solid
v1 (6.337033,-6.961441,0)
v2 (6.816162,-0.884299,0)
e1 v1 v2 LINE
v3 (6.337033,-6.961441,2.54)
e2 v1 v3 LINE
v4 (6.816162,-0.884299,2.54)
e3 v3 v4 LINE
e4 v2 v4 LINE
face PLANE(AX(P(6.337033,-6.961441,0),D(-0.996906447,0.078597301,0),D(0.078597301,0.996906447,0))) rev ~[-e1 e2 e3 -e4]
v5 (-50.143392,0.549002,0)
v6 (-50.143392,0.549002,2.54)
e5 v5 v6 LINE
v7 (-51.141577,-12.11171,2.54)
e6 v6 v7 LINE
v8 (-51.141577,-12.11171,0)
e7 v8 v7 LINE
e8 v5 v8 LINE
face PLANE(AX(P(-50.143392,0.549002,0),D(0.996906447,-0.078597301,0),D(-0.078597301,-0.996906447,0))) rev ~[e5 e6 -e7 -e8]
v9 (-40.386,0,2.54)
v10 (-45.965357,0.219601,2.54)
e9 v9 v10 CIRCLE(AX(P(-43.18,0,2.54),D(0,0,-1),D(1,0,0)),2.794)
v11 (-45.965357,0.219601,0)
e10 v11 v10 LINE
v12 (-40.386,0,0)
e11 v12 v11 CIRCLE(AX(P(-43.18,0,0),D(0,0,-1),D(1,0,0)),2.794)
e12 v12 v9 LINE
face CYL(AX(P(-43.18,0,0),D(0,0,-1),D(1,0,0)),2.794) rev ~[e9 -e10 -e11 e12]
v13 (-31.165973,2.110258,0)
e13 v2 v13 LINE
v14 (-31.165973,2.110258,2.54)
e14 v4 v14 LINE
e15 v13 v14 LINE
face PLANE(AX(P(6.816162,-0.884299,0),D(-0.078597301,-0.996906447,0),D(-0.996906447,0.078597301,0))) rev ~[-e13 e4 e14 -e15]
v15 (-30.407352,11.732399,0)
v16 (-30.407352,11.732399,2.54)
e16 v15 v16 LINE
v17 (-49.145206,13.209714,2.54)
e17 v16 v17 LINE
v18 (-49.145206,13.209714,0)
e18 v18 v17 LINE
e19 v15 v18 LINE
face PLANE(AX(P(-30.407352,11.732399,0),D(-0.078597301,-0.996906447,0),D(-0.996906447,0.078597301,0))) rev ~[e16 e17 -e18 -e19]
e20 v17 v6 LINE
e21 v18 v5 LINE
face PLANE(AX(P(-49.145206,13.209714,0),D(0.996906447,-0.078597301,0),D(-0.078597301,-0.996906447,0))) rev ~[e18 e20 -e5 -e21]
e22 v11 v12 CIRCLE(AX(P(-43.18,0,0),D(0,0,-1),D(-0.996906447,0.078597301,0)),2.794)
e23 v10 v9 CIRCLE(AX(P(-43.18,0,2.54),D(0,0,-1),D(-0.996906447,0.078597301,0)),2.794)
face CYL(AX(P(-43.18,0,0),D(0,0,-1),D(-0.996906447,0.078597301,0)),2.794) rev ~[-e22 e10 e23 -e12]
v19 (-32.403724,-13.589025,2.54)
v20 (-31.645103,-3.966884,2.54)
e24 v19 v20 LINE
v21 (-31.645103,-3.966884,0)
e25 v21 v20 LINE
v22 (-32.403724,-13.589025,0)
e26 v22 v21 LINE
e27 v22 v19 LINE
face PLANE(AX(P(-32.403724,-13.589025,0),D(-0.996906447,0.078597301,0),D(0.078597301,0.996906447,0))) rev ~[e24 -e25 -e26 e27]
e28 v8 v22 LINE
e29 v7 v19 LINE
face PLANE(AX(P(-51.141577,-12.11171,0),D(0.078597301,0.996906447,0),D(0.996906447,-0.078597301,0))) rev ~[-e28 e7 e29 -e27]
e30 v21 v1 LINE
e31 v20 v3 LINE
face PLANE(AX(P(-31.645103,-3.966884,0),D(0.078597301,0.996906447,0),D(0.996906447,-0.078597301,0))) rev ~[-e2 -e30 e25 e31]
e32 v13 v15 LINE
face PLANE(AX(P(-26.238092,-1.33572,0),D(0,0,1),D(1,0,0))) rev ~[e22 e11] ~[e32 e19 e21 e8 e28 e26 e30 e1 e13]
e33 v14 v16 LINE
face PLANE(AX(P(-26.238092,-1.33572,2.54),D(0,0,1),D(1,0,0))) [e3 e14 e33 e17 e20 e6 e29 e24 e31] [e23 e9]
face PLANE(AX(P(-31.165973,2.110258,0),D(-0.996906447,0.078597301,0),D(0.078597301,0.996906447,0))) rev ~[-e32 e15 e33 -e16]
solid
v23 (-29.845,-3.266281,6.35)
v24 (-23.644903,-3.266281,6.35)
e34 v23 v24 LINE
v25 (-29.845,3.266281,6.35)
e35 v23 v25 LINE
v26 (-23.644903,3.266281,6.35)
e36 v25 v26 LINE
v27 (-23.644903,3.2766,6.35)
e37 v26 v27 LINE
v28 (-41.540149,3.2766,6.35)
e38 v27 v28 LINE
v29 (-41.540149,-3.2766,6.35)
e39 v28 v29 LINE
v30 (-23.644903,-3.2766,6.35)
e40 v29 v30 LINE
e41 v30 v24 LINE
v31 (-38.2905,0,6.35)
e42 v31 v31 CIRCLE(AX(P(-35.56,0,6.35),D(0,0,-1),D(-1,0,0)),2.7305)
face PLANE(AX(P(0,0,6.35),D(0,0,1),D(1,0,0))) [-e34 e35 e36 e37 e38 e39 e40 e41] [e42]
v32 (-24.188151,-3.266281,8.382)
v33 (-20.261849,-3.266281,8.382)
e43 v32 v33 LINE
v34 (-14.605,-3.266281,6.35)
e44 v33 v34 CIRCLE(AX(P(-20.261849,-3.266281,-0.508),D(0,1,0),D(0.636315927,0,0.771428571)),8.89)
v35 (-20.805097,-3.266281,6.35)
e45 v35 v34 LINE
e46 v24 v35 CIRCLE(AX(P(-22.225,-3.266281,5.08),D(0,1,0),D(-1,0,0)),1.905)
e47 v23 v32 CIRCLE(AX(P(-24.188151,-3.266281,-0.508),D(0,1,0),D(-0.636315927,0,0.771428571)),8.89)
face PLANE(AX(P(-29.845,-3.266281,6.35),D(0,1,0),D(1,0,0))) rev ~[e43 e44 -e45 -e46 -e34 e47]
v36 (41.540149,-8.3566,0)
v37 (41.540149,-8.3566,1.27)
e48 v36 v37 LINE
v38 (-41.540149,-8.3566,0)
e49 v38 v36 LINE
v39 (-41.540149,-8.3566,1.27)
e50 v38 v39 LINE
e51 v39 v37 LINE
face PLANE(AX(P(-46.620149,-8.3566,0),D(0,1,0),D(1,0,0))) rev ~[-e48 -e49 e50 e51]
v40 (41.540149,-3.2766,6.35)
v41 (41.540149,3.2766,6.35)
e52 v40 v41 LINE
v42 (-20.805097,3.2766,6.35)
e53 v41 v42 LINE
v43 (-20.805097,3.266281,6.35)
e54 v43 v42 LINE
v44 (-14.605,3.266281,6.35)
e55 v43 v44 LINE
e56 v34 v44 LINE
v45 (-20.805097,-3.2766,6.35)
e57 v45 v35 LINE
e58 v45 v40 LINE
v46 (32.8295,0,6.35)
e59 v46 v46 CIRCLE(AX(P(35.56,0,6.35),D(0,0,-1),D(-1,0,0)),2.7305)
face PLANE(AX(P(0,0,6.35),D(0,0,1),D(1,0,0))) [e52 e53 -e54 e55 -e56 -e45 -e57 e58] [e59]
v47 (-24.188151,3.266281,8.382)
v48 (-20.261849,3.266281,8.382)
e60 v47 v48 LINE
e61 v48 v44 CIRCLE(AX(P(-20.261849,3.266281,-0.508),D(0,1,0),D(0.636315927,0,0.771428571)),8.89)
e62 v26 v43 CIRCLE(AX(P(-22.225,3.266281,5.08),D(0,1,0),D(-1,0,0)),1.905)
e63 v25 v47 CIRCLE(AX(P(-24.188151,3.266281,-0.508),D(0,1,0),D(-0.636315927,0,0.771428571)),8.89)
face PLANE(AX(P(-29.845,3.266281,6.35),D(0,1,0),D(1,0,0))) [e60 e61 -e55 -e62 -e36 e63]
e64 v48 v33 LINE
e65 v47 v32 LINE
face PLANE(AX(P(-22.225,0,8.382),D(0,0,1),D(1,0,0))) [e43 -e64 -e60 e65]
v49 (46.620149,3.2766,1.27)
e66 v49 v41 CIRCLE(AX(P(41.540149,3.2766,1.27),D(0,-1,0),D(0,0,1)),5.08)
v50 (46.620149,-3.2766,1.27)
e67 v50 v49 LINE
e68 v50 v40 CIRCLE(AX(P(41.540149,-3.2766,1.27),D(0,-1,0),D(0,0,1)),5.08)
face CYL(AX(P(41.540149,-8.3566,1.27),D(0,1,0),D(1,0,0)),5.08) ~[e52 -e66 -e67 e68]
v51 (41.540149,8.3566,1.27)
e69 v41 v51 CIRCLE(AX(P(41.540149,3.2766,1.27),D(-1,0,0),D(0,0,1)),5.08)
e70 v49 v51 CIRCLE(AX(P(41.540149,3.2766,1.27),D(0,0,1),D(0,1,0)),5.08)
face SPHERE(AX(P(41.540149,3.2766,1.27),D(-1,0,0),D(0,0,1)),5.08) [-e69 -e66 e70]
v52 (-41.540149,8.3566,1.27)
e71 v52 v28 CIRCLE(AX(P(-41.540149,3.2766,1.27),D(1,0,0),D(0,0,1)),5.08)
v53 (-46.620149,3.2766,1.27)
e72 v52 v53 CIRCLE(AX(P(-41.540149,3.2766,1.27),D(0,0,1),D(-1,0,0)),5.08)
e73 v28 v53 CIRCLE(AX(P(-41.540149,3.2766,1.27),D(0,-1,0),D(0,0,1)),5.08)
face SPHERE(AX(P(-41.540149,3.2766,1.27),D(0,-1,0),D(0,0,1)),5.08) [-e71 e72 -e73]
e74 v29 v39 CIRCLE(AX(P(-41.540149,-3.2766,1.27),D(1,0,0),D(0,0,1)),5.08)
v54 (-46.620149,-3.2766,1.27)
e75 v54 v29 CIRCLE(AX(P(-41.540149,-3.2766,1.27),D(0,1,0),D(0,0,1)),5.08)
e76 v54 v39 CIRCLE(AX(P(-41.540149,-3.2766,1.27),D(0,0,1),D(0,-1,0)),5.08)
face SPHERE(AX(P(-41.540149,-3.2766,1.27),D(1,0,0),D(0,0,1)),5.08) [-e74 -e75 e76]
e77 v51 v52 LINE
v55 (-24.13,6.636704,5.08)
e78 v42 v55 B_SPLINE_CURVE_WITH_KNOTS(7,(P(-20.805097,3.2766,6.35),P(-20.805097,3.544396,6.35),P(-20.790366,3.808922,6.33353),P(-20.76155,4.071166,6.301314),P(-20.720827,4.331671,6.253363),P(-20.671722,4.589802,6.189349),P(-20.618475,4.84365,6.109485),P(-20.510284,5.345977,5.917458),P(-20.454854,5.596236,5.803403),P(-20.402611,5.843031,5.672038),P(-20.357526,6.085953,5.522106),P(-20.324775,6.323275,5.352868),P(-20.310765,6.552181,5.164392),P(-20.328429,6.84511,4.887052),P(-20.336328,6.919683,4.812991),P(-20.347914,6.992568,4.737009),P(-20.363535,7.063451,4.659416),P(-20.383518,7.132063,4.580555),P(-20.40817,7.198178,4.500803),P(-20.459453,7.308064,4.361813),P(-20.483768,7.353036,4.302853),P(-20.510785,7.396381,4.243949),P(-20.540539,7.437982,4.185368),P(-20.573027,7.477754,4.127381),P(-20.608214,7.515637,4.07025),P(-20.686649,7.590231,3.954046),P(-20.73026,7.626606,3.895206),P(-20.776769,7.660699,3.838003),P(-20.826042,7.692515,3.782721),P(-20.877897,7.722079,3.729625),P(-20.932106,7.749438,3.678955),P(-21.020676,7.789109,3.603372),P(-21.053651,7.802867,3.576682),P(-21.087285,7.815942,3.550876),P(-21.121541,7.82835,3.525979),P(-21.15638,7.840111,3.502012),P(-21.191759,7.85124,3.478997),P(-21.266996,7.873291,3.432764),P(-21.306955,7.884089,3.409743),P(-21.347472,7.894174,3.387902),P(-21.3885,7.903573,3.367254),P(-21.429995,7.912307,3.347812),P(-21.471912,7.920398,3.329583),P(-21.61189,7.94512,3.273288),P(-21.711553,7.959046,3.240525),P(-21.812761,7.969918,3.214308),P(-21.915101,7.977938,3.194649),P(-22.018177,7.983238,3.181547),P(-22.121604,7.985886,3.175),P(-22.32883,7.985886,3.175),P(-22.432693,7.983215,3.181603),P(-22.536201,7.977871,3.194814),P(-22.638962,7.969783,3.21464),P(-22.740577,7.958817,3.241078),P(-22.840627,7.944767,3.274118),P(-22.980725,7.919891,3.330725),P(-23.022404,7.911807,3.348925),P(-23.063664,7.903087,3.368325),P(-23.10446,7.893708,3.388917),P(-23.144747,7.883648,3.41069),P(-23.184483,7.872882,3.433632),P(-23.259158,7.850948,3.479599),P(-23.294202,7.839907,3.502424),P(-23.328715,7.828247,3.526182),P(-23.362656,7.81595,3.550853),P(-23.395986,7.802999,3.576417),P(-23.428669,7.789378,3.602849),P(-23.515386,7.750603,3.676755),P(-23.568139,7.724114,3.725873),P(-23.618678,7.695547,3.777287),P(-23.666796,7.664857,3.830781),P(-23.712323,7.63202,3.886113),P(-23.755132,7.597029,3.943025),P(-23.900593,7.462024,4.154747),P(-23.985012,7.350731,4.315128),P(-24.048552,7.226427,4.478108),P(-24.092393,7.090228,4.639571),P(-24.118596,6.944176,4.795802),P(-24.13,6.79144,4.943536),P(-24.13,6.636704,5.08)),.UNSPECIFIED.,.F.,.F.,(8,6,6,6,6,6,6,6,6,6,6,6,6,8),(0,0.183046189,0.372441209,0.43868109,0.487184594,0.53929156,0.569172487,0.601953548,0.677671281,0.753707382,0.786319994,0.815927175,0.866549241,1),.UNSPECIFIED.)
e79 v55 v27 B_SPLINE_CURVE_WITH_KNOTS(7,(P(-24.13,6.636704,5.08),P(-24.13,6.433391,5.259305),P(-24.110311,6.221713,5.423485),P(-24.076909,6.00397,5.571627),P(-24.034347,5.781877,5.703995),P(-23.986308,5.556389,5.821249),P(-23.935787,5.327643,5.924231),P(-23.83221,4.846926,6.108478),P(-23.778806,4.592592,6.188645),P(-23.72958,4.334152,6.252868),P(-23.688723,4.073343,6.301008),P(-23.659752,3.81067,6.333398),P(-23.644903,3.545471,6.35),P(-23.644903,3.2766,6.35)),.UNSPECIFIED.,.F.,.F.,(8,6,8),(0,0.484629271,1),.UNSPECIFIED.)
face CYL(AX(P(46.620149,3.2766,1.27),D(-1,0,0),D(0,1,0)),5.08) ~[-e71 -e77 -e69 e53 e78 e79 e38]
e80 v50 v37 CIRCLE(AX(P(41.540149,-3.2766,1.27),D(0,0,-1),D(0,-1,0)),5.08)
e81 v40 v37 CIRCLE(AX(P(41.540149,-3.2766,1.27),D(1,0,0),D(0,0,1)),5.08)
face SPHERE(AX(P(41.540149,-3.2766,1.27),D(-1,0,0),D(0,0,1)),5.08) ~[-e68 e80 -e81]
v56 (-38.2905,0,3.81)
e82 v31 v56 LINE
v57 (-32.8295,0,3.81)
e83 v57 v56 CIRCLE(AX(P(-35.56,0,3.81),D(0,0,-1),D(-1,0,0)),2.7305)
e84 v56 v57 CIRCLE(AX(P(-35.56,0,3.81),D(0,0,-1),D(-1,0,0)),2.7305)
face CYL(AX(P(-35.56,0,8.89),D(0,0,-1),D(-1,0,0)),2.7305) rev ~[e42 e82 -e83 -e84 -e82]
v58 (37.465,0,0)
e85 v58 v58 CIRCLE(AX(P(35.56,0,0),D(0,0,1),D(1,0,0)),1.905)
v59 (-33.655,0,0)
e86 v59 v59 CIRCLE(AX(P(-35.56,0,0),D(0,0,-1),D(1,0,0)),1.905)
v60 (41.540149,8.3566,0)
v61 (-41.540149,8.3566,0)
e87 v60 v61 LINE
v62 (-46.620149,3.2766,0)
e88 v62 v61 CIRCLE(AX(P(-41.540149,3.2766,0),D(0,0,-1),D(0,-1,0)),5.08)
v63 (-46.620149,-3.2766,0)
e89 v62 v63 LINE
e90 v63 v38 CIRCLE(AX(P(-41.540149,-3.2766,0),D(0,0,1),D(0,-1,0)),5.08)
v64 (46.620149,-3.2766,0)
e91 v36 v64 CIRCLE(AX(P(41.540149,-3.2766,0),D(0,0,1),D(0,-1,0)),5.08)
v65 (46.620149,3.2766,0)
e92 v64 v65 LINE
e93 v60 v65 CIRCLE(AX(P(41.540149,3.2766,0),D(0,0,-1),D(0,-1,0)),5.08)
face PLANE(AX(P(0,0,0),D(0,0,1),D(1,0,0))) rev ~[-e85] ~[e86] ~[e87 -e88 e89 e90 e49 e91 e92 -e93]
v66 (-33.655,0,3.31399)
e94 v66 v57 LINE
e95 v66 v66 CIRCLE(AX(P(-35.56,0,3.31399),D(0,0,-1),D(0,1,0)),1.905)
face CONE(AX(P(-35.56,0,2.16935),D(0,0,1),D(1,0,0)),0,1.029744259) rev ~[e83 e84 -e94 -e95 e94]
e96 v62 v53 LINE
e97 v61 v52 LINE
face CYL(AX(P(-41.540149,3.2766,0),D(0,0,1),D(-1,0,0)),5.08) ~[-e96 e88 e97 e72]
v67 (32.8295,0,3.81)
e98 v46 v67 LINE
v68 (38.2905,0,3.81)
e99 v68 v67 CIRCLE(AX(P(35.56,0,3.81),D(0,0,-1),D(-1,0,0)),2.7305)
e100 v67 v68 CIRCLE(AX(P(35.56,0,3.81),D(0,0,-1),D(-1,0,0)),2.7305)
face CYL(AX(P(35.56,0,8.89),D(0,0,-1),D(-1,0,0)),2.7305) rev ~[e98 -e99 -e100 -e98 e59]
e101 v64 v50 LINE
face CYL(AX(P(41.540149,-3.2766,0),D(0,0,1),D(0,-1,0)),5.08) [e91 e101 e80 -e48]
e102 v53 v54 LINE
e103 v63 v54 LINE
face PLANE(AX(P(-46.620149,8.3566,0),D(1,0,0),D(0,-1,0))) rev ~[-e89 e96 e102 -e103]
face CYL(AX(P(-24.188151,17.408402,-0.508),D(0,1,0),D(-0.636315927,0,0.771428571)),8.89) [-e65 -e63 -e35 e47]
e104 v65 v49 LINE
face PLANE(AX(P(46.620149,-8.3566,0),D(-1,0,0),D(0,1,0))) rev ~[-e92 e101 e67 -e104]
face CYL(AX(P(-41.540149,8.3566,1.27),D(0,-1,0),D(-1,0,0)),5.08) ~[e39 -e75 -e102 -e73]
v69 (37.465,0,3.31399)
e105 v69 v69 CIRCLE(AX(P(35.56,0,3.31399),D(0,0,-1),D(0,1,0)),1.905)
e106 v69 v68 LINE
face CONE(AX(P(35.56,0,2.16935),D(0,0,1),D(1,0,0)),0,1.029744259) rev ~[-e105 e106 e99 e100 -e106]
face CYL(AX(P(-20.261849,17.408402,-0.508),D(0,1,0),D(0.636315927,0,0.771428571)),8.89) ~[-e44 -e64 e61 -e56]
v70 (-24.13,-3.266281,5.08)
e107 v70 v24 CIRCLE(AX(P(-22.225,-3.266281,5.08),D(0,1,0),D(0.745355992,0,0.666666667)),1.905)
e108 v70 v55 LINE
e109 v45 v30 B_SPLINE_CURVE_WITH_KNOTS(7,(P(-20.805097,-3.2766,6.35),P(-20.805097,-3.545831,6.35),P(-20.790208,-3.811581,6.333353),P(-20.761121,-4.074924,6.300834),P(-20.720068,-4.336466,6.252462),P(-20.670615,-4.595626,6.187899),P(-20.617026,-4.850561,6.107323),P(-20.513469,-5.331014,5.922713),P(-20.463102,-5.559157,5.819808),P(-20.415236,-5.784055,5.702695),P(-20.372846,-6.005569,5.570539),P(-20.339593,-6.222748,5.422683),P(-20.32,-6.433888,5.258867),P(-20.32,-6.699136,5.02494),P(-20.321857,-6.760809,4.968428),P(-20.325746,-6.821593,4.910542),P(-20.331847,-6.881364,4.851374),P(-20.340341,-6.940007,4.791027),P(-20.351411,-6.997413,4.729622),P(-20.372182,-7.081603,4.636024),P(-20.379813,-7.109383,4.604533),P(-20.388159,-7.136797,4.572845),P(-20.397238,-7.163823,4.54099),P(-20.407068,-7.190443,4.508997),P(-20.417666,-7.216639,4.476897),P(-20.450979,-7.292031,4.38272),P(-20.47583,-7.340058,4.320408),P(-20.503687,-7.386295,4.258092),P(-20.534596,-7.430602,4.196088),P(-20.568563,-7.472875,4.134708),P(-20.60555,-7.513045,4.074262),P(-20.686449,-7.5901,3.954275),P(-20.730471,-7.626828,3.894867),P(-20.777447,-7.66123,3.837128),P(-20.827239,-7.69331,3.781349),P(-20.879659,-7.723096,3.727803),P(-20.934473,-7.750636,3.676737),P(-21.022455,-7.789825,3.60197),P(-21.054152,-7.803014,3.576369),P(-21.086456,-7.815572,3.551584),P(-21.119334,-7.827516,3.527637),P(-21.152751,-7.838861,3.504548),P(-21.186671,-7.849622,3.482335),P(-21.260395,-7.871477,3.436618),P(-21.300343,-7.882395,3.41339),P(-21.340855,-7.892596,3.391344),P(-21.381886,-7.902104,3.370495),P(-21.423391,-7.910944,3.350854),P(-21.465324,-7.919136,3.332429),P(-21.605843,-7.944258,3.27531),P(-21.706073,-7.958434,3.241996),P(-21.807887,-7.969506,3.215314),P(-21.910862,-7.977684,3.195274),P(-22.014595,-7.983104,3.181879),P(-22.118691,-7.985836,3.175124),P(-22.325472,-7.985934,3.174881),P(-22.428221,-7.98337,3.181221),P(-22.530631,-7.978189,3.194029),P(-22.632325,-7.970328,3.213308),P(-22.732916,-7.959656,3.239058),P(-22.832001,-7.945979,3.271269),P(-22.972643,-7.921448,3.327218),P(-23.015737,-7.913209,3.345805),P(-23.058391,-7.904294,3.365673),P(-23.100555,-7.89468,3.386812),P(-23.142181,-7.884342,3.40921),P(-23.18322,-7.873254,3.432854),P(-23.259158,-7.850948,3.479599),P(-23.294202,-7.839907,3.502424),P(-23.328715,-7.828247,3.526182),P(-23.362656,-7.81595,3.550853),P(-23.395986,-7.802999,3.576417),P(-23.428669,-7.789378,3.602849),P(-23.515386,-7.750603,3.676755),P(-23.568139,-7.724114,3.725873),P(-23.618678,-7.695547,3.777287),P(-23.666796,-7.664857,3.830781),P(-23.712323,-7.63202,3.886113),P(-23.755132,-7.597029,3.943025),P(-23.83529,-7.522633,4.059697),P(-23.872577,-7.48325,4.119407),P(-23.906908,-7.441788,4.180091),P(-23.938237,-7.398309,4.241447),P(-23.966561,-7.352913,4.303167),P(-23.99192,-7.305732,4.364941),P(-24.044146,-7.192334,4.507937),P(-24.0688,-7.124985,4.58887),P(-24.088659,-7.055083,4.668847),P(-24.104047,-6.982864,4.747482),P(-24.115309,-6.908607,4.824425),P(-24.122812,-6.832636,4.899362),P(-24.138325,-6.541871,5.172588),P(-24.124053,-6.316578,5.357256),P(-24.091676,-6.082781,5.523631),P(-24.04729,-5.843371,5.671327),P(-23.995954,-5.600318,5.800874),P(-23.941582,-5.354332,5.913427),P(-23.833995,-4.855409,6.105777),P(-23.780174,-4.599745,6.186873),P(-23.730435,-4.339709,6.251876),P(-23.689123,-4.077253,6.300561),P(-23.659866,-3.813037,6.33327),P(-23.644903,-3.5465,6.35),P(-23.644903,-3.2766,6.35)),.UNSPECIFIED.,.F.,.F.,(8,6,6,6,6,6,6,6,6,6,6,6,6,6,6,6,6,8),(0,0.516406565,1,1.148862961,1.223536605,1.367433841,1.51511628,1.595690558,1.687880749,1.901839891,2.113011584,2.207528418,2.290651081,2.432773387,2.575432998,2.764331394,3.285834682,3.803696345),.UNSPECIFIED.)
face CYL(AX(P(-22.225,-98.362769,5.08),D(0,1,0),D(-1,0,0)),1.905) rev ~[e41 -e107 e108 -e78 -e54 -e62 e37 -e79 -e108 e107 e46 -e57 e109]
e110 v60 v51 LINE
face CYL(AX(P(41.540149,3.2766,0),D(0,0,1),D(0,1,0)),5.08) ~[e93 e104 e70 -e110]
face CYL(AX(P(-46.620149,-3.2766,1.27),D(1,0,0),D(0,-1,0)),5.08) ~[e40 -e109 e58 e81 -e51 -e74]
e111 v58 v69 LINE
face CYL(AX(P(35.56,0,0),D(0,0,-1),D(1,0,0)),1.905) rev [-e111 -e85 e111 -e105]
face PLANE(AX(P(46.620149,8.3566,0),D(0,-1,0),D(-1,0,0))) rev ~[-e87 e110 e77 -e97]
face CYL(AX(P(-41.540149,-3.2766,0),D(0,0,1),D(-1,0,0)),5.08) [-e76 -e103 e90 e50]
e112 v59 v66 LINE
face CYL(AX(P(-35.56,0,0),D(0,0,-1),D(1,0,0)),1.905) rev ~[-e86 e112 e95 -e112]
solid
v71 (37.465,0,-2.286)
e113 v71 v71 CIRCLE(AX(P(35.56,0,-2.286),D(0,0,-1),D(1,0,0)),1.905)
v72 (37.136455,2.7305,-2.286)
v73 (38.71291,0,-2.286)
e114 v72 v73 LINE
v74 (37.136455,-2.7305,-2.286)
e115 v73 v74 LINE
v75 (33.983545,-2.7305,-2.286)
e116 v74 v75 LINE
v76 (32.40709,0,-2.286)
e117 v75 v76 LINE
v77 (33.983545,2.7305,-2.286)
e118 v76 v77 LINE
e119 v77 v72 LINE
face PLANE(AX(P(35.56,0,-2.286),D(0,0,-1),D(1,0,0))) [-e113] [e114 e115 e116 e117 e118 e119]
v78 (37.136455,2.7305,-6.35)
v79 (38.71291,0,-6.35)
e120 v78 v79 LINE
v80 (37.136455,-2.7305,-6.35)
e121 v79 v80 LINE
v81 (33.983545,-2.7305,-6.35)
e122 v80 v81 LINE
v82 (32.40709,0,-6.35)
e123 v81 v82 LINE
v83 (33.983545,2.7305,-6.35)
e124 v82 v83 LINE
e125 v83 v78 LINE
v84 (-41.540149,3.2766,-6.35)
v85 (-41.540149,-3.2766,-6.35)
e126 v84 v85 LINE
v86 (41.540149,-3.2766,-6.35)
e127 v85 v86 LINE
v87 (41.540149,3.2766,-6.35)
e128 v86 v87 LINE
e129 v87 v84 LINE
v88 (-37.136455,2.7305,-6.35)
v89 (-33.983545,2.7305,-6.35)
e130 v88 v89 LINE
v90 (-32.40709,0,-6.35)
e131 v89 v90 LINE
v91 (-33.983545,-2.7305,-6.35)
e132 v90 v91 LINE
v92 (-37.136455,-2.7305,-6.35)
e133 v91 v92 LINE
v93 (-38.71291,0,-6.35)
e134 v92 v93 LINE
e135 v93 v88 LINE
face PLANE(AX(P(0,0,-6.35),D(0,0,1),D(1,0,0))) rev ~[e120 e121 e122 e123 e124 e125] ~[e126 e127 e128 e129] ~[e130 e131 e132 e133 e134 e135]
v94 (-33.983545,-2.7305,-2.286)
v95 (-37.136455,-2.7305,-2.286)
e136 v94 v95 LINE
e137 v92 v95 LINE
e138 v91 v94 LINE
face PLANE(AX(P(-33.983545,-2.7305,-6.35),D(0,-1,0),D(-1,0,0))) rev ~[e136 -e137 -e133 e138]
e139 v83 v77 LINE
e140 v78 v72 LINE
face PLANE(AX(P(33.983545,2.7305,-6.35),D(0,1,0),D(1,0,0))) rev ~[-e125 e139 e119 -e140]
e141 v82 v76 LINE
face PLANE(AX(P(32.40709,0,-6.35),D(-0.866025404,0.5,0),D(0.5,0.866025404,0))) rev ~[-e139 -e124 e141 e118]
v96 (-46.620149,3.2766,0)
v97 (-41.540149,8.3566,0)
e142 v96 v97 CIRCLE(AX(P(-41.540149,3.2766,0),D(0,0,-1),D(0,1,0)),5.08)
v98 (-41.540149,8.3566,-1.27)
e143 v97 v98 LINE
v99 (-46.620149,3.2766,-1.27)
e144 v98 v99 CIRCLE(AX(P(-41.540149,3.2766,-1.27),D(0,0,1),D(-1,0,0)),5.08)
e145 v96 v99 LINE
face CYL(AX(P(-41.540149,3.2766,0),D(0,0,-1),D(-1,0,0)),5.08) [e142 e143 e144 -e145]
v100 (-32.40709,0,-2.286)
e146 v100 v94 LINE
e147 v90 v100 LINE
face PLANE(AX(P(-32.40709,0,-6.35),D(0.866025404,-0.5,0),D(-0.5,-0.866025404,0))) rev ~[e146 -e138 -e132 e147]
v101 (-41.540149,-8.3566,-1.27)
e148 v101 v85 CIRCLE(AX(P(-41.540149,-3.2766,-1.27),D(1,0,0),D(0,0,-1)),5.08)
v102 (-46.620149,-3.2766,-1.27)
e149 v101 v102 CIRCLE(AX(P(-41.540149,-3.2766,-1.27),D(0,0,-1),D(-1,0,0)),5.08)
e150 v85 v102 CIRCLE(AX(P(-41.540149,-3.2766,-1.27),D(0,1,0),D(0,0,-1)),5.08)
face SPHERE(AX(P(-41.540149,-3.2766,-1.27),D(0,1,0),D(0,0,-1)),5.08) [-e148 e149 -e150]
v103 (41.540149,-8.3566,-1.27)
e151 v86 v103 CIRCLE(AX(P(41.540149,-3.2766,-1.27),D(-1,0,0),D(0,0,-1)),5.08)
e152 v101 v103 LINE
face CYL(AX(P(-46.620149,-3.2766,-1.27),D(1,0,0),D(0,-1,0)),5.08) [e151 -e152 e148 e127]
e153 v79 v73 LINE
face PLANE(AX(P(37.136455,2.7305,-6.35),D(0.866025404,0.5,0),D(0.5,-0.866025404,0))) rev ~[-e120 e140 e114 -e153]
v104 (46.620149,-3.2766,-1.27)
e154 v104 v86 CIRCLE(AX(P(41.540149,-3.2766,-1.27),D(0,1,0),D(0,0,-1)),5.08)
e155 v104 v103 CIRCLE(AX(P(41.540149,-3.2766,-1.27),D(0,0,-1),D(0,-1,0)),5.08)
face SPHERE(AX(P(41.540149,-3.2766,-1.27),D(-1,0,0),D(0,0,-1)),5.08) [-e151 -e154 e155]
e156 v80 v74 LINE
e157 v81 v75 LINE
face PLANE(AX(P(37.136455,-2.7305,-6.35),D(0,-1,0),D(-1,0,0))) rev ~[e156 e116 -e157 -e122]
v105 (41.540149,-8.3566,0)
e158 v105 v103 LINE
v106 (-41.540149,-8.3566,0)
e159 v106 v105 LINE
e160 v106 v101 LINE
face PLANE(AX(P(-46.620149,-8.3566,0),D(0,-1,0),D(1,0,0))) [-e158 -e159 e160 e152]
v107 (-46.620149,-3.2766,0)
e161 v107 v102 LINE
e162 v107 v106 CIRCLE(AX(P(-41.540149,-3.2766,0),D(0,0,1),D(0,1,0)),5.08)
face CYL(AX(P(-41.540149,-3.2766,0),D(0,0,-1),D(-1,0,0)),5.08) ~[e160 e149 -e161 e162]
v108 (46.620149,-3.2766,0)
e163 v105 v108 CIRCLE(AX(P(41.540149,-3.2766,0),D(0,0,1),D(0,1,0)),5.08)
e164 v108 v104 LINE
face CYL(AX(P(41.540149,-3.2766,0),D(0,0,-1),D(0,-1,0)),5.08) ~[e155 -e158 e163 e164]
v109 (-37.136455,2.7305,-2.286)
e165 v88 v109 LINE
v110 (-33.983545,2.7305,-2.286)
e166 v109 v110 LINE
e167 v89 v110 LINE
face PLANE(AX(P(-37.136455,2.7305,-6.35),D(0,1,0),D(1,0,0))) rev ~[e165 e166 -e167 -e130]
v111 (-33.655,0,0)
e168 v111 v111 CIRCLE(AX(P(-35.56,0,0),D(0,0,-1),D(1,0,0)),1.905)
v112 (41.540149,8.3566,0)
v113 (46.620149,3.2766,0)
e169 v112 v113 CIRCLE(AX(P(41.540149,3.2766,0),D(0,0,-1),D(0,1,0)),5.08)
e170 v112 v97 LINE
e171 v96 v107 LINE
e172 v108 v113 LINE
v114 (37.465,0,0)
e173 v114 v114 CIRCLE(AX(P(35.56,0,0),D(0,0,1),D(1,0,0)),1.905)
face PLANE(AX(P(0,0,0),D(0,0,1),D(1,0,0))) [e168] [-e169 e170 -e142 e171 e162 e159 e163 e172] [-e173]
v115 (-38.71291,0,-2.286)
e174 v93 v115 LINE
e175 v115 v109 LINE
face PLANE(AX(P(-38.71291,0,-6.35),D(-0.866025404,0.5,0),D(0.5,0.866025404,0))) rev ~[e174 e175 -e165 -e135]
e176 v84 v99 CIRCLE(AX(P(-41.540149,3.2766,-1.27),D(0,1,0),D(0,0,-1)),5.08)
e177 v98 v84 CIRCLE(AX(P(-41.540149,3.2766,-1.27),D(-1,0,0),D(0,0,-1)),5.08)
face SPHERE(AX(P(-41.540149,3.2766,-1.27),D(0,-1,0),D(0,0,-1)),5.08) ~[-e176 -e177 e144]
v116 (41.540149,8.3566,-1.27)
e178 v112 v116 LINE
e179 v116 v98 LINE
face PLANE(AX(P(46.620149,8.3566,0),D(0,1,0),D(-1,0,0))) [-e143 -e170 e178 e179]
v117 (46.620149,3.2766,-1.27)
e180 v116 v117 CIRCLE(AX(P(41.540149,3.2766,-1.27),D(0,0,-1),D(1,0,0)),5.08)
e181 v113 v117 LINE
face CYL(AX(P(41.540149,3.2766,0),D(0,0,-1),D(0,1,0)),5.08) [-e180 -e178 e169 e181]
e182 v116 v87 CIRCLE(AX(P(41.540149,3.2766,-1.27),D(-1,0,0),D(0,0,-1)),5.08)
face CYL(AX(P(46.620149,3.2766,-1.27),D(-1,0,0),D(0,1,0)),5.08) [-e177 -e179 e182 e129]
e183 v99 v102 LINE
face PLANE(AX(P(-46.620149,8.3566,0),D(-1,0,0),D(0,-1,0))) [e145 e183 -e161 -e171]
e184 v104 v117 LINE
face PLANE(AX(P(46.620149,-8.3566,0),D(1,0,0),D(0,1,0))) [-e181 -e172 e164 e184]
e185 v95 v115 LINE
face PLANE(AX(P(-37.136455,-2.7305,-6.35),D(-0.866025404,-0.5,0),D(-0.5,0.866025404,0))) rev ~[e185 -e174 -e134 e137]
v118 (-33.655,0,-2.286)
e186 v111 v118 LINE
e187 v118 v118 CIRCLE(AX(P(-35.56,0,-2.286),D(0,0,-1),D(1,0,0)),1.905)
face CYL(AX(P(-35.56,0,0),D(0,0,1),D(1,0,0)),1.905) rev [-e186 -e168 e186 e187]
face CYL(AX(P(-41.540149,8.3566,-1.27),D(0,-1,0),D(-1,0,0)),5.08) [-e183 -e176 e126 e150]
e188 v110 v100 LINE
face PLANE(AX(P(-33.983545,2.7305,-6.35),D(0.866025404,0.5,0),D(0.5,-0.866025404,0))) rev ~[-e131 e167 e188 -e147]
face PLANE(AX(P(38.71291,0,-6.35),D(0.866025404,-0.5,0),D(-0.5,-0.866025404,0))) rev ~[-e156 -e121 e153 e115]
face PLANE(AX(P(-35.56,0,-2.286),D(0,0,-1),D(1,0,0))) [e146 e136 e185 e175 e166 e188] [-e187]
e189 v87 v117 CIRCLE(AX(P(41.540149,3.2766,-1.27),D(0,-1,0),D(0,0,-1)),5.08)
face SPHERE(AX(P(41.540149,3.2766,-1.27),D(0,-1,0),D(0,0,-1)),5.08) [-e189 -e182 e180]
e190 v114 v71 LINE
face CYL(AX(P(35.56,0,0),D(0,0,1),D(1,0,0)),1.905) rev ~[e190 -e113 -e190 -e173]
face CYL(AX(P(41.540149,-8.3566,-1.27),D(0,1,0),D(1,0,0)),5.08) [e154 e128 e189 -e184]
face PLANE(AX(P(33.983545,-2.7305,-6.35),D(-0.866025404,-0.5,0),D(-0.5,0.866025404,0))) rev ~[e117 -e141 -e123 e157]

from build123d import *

# Parameters (mm, degrees)
F1_DEPTH    = 2.54
F2_R        = 1.905
F3_DEPTH    = 6.35
F4_DEPTH    = 6.35
F5_R        = 5.08
F6_R        = 5.08
F7_W        = 15.24
F7_H        = 6.5325613847
F8_DEPTH    = 2.032
F9_T1_DEPTH = 34.8168043479
F11_D       = 3.81
F11_DEPTH   = 5.0913193076
F12_D       = 3.81
F14_D       = 5.461
F14_DEPTH   = 2.54
F14_TIP     = 1.6406499203
F15_R       = 1.905
F16_DEPTH   = 4.064


# Not quite as in the source:
# - a fillet or chamfer that OpenCascade refuses, or shapes differently, is made with other operations: its cross-section is extruded or revolved along the edge and cut away or added
# - a feature of the source that left no trace in its solid (it failed there, or was rolled back) is left out


with BuildPart() as f1:
    # F0 (on Top) → F1 (new body)
    with BuildSketch(Plane.XY):
        Polygon((-30.4073522295, 11.7323991549), (-49.1452058091, 13.2097140262), (-50.143391533, 0.5490021481), (-51.1415772568, -12.11170973), (-32.4037236772, -13.5890246013), (-31.6451025271, -3.9668835739), (6.3370331073, -6.9614407455), (6.8161622547, -0.884299044), (-31.1659733796, 2.1102581276), align=None)
        with BuildLine():
            ThreePointArc((-40.386, 0), (-43.2898854466, -2.7918383171), (-45.9653566132, 0.2196008592))
            ThreePointArc((-45.9653566132, 0.2196008592), (-43.0701145534, 2.7918383171), (-40.386, 0))
        make_face(mode=Mode.SUBTRACT)
    extrude(amount=F1_DEPTH)


with BuildPart() as f3:
    # F2 (on Top) → F3 (new body)
    with BuildSketch(Plane.XY):
        Polygon((-46.6201489315, 8.3566), (-46.6201489315, 0), (-46.6201489315, -8.3566), (0, -8.3566), (46.6201489315, -8.3566), (46.6201489315, 0), (46.6201489315, 8.3566), (0, 8.3566), align=None)
        with BuildLine():
            ThreePointArc((-37.465, 0), (-35.56, 1.905), (-33.655, 0))
            ThreePointArc((-33.655, 0), (-35.56, -1.905), (-37.465, 0))
        make_face(mode=Mode.SUBTRACT)
        with Locations((35.56, 0)):
            Circle(F2_R, mode=Mode.SUBTRACT)
    extrude(amount=F3_DEPTH)

    # F5
    f5_edges = [f3.edges().sort_by_distance(p)[0] for p in [
        (0, -8.3566, 6.35),
        (-46.620149, 0, 6.35),
        (0, 8.3566, 6.35),
        (46.620149, 0, 6.35),
        (-46.620149, -8.3566, 3.175),
        (-46.620149, 8.3566, 3.175),
        (46.620149, -8.3566, 3.175),
        (46.620149, 8.3566, 3.175),
    ]]
    fillet(f5_edges, radius=F5_R)

    # F7 (on face) → F8 (join)
    with BuildSketch(Plane.XY.offset(6.35)):
        with Locations((-22.225, 0)):
            Rectangle(F7_W, F7_H)
    extrude(amount=F8_DEPTH)

    # F9: fillet of radius 8.89 on 2 edges, made by hand

    # F9_s2 → F9_t1 (cut)
    with BuildSketch(Plane.XZ.offset(-17.408402174)):
        with BuildLine():
            ThreePointArc((-29.845, 6.35), (-27.1935199372, 7.8585918987), (-24.1881514074, 8.382))
            Line((-24.1881514074, 8.382), (-29.845, 8.382))
            Line((-29.845, 8.382), (-29.845, 6.35))
        make_face()
        with BuildLine():
            ThreePointArc((-14.605, 6.35), (-17.2564800628, 7.8585918987), (-20.2618485926, 8.382))
            Line((-20.2618485926, 8.382), (-14.605, 8.382))
            Line((-14.605, 8.382), (-14.605, 6.35))
        make_face()
    extrude(amount=F9_T1_DEPTH, mode=Mode.SUBTRACT)

    # F11 (through all, one way)
    with BuildSketch(Plane(origin=(0, -3.2662806924, 0), x_dir=(1, 0, 0), z_dir=(0, 1, 0))):
        with Locations((-22.225, -5.08)):
            Circle(F11_D / 2)
    extrude(amount=-F11_DEPTH, mode=Mode.SUBTRACT)

    # F12 (through all)
    with Locations(Plane.XZ.offset(3.2662806924)):
        with Locations((-22.225, 5.08)):
            Hole(F12_D / 2)

    # F14
    with Locations(Plane.XY.offset(6.35)):
        with Locations((35.56, 0), (-35.56, 0)):
            Hole(F14_D / 2, depth=F14_DEPTH)
            with Locations((0, 0, -(F14_DEPTH + F14_TIP / 2))):  # 118° drill point
                Cone(0, F14_D / 2, F14_TIP, mode=Mode.SUBTRACT)


with BuildPart() as f4:
    # F2 (on Top) → F4 (new body)
    with BuildSketch(Plane.XY):
        Polygon((-46.6201489315, 8.3566), (-46.6201489315, 0), (-46.6201489315, -8.3566), (0, -8.3566), (46.6201489315, -8.3566), (46.6201489315, 0), (46.6201489315, 8.3566), (0, 8.3566), align=None)
        with BuildLine():
            ThreePointArc((-37.465, 0), (-35.56, 1.905), (-33.655, 0))
            ThreePointArc((-33.655, 0), (-35.56, -1.905), (-37.465, 0))
        make_face(mode=Mode.SUBTRACT)
        with Locations((35.56, 0)):
            Circle(F2_R, mode=Mode.SUBTRACT)
    extrude(amount=-F4_DEPTH)

    # F6
    f6_edges = [f4.edges().sort_by_distance(p)[0] for p in [
        (-46.620149, 0, -6.35),
        (0, -8.3566, -6.35),
        (46.620149, 0, -6.35),
        (0, 8.3566, -6.35),
        (46.620149, -8.3566, -3.175),
        (46.620149, 8.3566, -3.175),
        (-46.620149, -8.3566, -3.175),
        (-46.620149, 8.3566, -3.175),
    ]]
    fillet(f6_edges, radius=F6_R)

    # F15 (on face) → F16 (cut)
    with BuildSketch(Plane(origin=(0, 0, -6.35), x_dir=(1, 0, 0), z_dir=(0, 0, -1))):
        Polygon((-33.98354509, -2.7305), (-32.40709018, 0), (-33.98354509, 2.7305), (-37.13645491, 2.7305), (-38.71290982, 0), (-37.13645491, -2.7305), align=None)
        with Locations((-35.56, 0)):
            Circle(F15_R, mode=Mode.SUBTRACT)
        Polygon((37.13645491, -2.7305), (38.71290982, 0), (37.13645491, 2.7305), (33.98354509, 2.7305), (32.40709018, 0), (33.98354509, -2.7305), align=None)
        with Locations((35.56, 0)):
            Circle(F15_R, mode=Mode.SUBTRACT)
    extrude(amount=-F16_DEPTH, mode=Mode.SUBTRACT)


solid = Compound([f1.part, f3.part, f4.part])
